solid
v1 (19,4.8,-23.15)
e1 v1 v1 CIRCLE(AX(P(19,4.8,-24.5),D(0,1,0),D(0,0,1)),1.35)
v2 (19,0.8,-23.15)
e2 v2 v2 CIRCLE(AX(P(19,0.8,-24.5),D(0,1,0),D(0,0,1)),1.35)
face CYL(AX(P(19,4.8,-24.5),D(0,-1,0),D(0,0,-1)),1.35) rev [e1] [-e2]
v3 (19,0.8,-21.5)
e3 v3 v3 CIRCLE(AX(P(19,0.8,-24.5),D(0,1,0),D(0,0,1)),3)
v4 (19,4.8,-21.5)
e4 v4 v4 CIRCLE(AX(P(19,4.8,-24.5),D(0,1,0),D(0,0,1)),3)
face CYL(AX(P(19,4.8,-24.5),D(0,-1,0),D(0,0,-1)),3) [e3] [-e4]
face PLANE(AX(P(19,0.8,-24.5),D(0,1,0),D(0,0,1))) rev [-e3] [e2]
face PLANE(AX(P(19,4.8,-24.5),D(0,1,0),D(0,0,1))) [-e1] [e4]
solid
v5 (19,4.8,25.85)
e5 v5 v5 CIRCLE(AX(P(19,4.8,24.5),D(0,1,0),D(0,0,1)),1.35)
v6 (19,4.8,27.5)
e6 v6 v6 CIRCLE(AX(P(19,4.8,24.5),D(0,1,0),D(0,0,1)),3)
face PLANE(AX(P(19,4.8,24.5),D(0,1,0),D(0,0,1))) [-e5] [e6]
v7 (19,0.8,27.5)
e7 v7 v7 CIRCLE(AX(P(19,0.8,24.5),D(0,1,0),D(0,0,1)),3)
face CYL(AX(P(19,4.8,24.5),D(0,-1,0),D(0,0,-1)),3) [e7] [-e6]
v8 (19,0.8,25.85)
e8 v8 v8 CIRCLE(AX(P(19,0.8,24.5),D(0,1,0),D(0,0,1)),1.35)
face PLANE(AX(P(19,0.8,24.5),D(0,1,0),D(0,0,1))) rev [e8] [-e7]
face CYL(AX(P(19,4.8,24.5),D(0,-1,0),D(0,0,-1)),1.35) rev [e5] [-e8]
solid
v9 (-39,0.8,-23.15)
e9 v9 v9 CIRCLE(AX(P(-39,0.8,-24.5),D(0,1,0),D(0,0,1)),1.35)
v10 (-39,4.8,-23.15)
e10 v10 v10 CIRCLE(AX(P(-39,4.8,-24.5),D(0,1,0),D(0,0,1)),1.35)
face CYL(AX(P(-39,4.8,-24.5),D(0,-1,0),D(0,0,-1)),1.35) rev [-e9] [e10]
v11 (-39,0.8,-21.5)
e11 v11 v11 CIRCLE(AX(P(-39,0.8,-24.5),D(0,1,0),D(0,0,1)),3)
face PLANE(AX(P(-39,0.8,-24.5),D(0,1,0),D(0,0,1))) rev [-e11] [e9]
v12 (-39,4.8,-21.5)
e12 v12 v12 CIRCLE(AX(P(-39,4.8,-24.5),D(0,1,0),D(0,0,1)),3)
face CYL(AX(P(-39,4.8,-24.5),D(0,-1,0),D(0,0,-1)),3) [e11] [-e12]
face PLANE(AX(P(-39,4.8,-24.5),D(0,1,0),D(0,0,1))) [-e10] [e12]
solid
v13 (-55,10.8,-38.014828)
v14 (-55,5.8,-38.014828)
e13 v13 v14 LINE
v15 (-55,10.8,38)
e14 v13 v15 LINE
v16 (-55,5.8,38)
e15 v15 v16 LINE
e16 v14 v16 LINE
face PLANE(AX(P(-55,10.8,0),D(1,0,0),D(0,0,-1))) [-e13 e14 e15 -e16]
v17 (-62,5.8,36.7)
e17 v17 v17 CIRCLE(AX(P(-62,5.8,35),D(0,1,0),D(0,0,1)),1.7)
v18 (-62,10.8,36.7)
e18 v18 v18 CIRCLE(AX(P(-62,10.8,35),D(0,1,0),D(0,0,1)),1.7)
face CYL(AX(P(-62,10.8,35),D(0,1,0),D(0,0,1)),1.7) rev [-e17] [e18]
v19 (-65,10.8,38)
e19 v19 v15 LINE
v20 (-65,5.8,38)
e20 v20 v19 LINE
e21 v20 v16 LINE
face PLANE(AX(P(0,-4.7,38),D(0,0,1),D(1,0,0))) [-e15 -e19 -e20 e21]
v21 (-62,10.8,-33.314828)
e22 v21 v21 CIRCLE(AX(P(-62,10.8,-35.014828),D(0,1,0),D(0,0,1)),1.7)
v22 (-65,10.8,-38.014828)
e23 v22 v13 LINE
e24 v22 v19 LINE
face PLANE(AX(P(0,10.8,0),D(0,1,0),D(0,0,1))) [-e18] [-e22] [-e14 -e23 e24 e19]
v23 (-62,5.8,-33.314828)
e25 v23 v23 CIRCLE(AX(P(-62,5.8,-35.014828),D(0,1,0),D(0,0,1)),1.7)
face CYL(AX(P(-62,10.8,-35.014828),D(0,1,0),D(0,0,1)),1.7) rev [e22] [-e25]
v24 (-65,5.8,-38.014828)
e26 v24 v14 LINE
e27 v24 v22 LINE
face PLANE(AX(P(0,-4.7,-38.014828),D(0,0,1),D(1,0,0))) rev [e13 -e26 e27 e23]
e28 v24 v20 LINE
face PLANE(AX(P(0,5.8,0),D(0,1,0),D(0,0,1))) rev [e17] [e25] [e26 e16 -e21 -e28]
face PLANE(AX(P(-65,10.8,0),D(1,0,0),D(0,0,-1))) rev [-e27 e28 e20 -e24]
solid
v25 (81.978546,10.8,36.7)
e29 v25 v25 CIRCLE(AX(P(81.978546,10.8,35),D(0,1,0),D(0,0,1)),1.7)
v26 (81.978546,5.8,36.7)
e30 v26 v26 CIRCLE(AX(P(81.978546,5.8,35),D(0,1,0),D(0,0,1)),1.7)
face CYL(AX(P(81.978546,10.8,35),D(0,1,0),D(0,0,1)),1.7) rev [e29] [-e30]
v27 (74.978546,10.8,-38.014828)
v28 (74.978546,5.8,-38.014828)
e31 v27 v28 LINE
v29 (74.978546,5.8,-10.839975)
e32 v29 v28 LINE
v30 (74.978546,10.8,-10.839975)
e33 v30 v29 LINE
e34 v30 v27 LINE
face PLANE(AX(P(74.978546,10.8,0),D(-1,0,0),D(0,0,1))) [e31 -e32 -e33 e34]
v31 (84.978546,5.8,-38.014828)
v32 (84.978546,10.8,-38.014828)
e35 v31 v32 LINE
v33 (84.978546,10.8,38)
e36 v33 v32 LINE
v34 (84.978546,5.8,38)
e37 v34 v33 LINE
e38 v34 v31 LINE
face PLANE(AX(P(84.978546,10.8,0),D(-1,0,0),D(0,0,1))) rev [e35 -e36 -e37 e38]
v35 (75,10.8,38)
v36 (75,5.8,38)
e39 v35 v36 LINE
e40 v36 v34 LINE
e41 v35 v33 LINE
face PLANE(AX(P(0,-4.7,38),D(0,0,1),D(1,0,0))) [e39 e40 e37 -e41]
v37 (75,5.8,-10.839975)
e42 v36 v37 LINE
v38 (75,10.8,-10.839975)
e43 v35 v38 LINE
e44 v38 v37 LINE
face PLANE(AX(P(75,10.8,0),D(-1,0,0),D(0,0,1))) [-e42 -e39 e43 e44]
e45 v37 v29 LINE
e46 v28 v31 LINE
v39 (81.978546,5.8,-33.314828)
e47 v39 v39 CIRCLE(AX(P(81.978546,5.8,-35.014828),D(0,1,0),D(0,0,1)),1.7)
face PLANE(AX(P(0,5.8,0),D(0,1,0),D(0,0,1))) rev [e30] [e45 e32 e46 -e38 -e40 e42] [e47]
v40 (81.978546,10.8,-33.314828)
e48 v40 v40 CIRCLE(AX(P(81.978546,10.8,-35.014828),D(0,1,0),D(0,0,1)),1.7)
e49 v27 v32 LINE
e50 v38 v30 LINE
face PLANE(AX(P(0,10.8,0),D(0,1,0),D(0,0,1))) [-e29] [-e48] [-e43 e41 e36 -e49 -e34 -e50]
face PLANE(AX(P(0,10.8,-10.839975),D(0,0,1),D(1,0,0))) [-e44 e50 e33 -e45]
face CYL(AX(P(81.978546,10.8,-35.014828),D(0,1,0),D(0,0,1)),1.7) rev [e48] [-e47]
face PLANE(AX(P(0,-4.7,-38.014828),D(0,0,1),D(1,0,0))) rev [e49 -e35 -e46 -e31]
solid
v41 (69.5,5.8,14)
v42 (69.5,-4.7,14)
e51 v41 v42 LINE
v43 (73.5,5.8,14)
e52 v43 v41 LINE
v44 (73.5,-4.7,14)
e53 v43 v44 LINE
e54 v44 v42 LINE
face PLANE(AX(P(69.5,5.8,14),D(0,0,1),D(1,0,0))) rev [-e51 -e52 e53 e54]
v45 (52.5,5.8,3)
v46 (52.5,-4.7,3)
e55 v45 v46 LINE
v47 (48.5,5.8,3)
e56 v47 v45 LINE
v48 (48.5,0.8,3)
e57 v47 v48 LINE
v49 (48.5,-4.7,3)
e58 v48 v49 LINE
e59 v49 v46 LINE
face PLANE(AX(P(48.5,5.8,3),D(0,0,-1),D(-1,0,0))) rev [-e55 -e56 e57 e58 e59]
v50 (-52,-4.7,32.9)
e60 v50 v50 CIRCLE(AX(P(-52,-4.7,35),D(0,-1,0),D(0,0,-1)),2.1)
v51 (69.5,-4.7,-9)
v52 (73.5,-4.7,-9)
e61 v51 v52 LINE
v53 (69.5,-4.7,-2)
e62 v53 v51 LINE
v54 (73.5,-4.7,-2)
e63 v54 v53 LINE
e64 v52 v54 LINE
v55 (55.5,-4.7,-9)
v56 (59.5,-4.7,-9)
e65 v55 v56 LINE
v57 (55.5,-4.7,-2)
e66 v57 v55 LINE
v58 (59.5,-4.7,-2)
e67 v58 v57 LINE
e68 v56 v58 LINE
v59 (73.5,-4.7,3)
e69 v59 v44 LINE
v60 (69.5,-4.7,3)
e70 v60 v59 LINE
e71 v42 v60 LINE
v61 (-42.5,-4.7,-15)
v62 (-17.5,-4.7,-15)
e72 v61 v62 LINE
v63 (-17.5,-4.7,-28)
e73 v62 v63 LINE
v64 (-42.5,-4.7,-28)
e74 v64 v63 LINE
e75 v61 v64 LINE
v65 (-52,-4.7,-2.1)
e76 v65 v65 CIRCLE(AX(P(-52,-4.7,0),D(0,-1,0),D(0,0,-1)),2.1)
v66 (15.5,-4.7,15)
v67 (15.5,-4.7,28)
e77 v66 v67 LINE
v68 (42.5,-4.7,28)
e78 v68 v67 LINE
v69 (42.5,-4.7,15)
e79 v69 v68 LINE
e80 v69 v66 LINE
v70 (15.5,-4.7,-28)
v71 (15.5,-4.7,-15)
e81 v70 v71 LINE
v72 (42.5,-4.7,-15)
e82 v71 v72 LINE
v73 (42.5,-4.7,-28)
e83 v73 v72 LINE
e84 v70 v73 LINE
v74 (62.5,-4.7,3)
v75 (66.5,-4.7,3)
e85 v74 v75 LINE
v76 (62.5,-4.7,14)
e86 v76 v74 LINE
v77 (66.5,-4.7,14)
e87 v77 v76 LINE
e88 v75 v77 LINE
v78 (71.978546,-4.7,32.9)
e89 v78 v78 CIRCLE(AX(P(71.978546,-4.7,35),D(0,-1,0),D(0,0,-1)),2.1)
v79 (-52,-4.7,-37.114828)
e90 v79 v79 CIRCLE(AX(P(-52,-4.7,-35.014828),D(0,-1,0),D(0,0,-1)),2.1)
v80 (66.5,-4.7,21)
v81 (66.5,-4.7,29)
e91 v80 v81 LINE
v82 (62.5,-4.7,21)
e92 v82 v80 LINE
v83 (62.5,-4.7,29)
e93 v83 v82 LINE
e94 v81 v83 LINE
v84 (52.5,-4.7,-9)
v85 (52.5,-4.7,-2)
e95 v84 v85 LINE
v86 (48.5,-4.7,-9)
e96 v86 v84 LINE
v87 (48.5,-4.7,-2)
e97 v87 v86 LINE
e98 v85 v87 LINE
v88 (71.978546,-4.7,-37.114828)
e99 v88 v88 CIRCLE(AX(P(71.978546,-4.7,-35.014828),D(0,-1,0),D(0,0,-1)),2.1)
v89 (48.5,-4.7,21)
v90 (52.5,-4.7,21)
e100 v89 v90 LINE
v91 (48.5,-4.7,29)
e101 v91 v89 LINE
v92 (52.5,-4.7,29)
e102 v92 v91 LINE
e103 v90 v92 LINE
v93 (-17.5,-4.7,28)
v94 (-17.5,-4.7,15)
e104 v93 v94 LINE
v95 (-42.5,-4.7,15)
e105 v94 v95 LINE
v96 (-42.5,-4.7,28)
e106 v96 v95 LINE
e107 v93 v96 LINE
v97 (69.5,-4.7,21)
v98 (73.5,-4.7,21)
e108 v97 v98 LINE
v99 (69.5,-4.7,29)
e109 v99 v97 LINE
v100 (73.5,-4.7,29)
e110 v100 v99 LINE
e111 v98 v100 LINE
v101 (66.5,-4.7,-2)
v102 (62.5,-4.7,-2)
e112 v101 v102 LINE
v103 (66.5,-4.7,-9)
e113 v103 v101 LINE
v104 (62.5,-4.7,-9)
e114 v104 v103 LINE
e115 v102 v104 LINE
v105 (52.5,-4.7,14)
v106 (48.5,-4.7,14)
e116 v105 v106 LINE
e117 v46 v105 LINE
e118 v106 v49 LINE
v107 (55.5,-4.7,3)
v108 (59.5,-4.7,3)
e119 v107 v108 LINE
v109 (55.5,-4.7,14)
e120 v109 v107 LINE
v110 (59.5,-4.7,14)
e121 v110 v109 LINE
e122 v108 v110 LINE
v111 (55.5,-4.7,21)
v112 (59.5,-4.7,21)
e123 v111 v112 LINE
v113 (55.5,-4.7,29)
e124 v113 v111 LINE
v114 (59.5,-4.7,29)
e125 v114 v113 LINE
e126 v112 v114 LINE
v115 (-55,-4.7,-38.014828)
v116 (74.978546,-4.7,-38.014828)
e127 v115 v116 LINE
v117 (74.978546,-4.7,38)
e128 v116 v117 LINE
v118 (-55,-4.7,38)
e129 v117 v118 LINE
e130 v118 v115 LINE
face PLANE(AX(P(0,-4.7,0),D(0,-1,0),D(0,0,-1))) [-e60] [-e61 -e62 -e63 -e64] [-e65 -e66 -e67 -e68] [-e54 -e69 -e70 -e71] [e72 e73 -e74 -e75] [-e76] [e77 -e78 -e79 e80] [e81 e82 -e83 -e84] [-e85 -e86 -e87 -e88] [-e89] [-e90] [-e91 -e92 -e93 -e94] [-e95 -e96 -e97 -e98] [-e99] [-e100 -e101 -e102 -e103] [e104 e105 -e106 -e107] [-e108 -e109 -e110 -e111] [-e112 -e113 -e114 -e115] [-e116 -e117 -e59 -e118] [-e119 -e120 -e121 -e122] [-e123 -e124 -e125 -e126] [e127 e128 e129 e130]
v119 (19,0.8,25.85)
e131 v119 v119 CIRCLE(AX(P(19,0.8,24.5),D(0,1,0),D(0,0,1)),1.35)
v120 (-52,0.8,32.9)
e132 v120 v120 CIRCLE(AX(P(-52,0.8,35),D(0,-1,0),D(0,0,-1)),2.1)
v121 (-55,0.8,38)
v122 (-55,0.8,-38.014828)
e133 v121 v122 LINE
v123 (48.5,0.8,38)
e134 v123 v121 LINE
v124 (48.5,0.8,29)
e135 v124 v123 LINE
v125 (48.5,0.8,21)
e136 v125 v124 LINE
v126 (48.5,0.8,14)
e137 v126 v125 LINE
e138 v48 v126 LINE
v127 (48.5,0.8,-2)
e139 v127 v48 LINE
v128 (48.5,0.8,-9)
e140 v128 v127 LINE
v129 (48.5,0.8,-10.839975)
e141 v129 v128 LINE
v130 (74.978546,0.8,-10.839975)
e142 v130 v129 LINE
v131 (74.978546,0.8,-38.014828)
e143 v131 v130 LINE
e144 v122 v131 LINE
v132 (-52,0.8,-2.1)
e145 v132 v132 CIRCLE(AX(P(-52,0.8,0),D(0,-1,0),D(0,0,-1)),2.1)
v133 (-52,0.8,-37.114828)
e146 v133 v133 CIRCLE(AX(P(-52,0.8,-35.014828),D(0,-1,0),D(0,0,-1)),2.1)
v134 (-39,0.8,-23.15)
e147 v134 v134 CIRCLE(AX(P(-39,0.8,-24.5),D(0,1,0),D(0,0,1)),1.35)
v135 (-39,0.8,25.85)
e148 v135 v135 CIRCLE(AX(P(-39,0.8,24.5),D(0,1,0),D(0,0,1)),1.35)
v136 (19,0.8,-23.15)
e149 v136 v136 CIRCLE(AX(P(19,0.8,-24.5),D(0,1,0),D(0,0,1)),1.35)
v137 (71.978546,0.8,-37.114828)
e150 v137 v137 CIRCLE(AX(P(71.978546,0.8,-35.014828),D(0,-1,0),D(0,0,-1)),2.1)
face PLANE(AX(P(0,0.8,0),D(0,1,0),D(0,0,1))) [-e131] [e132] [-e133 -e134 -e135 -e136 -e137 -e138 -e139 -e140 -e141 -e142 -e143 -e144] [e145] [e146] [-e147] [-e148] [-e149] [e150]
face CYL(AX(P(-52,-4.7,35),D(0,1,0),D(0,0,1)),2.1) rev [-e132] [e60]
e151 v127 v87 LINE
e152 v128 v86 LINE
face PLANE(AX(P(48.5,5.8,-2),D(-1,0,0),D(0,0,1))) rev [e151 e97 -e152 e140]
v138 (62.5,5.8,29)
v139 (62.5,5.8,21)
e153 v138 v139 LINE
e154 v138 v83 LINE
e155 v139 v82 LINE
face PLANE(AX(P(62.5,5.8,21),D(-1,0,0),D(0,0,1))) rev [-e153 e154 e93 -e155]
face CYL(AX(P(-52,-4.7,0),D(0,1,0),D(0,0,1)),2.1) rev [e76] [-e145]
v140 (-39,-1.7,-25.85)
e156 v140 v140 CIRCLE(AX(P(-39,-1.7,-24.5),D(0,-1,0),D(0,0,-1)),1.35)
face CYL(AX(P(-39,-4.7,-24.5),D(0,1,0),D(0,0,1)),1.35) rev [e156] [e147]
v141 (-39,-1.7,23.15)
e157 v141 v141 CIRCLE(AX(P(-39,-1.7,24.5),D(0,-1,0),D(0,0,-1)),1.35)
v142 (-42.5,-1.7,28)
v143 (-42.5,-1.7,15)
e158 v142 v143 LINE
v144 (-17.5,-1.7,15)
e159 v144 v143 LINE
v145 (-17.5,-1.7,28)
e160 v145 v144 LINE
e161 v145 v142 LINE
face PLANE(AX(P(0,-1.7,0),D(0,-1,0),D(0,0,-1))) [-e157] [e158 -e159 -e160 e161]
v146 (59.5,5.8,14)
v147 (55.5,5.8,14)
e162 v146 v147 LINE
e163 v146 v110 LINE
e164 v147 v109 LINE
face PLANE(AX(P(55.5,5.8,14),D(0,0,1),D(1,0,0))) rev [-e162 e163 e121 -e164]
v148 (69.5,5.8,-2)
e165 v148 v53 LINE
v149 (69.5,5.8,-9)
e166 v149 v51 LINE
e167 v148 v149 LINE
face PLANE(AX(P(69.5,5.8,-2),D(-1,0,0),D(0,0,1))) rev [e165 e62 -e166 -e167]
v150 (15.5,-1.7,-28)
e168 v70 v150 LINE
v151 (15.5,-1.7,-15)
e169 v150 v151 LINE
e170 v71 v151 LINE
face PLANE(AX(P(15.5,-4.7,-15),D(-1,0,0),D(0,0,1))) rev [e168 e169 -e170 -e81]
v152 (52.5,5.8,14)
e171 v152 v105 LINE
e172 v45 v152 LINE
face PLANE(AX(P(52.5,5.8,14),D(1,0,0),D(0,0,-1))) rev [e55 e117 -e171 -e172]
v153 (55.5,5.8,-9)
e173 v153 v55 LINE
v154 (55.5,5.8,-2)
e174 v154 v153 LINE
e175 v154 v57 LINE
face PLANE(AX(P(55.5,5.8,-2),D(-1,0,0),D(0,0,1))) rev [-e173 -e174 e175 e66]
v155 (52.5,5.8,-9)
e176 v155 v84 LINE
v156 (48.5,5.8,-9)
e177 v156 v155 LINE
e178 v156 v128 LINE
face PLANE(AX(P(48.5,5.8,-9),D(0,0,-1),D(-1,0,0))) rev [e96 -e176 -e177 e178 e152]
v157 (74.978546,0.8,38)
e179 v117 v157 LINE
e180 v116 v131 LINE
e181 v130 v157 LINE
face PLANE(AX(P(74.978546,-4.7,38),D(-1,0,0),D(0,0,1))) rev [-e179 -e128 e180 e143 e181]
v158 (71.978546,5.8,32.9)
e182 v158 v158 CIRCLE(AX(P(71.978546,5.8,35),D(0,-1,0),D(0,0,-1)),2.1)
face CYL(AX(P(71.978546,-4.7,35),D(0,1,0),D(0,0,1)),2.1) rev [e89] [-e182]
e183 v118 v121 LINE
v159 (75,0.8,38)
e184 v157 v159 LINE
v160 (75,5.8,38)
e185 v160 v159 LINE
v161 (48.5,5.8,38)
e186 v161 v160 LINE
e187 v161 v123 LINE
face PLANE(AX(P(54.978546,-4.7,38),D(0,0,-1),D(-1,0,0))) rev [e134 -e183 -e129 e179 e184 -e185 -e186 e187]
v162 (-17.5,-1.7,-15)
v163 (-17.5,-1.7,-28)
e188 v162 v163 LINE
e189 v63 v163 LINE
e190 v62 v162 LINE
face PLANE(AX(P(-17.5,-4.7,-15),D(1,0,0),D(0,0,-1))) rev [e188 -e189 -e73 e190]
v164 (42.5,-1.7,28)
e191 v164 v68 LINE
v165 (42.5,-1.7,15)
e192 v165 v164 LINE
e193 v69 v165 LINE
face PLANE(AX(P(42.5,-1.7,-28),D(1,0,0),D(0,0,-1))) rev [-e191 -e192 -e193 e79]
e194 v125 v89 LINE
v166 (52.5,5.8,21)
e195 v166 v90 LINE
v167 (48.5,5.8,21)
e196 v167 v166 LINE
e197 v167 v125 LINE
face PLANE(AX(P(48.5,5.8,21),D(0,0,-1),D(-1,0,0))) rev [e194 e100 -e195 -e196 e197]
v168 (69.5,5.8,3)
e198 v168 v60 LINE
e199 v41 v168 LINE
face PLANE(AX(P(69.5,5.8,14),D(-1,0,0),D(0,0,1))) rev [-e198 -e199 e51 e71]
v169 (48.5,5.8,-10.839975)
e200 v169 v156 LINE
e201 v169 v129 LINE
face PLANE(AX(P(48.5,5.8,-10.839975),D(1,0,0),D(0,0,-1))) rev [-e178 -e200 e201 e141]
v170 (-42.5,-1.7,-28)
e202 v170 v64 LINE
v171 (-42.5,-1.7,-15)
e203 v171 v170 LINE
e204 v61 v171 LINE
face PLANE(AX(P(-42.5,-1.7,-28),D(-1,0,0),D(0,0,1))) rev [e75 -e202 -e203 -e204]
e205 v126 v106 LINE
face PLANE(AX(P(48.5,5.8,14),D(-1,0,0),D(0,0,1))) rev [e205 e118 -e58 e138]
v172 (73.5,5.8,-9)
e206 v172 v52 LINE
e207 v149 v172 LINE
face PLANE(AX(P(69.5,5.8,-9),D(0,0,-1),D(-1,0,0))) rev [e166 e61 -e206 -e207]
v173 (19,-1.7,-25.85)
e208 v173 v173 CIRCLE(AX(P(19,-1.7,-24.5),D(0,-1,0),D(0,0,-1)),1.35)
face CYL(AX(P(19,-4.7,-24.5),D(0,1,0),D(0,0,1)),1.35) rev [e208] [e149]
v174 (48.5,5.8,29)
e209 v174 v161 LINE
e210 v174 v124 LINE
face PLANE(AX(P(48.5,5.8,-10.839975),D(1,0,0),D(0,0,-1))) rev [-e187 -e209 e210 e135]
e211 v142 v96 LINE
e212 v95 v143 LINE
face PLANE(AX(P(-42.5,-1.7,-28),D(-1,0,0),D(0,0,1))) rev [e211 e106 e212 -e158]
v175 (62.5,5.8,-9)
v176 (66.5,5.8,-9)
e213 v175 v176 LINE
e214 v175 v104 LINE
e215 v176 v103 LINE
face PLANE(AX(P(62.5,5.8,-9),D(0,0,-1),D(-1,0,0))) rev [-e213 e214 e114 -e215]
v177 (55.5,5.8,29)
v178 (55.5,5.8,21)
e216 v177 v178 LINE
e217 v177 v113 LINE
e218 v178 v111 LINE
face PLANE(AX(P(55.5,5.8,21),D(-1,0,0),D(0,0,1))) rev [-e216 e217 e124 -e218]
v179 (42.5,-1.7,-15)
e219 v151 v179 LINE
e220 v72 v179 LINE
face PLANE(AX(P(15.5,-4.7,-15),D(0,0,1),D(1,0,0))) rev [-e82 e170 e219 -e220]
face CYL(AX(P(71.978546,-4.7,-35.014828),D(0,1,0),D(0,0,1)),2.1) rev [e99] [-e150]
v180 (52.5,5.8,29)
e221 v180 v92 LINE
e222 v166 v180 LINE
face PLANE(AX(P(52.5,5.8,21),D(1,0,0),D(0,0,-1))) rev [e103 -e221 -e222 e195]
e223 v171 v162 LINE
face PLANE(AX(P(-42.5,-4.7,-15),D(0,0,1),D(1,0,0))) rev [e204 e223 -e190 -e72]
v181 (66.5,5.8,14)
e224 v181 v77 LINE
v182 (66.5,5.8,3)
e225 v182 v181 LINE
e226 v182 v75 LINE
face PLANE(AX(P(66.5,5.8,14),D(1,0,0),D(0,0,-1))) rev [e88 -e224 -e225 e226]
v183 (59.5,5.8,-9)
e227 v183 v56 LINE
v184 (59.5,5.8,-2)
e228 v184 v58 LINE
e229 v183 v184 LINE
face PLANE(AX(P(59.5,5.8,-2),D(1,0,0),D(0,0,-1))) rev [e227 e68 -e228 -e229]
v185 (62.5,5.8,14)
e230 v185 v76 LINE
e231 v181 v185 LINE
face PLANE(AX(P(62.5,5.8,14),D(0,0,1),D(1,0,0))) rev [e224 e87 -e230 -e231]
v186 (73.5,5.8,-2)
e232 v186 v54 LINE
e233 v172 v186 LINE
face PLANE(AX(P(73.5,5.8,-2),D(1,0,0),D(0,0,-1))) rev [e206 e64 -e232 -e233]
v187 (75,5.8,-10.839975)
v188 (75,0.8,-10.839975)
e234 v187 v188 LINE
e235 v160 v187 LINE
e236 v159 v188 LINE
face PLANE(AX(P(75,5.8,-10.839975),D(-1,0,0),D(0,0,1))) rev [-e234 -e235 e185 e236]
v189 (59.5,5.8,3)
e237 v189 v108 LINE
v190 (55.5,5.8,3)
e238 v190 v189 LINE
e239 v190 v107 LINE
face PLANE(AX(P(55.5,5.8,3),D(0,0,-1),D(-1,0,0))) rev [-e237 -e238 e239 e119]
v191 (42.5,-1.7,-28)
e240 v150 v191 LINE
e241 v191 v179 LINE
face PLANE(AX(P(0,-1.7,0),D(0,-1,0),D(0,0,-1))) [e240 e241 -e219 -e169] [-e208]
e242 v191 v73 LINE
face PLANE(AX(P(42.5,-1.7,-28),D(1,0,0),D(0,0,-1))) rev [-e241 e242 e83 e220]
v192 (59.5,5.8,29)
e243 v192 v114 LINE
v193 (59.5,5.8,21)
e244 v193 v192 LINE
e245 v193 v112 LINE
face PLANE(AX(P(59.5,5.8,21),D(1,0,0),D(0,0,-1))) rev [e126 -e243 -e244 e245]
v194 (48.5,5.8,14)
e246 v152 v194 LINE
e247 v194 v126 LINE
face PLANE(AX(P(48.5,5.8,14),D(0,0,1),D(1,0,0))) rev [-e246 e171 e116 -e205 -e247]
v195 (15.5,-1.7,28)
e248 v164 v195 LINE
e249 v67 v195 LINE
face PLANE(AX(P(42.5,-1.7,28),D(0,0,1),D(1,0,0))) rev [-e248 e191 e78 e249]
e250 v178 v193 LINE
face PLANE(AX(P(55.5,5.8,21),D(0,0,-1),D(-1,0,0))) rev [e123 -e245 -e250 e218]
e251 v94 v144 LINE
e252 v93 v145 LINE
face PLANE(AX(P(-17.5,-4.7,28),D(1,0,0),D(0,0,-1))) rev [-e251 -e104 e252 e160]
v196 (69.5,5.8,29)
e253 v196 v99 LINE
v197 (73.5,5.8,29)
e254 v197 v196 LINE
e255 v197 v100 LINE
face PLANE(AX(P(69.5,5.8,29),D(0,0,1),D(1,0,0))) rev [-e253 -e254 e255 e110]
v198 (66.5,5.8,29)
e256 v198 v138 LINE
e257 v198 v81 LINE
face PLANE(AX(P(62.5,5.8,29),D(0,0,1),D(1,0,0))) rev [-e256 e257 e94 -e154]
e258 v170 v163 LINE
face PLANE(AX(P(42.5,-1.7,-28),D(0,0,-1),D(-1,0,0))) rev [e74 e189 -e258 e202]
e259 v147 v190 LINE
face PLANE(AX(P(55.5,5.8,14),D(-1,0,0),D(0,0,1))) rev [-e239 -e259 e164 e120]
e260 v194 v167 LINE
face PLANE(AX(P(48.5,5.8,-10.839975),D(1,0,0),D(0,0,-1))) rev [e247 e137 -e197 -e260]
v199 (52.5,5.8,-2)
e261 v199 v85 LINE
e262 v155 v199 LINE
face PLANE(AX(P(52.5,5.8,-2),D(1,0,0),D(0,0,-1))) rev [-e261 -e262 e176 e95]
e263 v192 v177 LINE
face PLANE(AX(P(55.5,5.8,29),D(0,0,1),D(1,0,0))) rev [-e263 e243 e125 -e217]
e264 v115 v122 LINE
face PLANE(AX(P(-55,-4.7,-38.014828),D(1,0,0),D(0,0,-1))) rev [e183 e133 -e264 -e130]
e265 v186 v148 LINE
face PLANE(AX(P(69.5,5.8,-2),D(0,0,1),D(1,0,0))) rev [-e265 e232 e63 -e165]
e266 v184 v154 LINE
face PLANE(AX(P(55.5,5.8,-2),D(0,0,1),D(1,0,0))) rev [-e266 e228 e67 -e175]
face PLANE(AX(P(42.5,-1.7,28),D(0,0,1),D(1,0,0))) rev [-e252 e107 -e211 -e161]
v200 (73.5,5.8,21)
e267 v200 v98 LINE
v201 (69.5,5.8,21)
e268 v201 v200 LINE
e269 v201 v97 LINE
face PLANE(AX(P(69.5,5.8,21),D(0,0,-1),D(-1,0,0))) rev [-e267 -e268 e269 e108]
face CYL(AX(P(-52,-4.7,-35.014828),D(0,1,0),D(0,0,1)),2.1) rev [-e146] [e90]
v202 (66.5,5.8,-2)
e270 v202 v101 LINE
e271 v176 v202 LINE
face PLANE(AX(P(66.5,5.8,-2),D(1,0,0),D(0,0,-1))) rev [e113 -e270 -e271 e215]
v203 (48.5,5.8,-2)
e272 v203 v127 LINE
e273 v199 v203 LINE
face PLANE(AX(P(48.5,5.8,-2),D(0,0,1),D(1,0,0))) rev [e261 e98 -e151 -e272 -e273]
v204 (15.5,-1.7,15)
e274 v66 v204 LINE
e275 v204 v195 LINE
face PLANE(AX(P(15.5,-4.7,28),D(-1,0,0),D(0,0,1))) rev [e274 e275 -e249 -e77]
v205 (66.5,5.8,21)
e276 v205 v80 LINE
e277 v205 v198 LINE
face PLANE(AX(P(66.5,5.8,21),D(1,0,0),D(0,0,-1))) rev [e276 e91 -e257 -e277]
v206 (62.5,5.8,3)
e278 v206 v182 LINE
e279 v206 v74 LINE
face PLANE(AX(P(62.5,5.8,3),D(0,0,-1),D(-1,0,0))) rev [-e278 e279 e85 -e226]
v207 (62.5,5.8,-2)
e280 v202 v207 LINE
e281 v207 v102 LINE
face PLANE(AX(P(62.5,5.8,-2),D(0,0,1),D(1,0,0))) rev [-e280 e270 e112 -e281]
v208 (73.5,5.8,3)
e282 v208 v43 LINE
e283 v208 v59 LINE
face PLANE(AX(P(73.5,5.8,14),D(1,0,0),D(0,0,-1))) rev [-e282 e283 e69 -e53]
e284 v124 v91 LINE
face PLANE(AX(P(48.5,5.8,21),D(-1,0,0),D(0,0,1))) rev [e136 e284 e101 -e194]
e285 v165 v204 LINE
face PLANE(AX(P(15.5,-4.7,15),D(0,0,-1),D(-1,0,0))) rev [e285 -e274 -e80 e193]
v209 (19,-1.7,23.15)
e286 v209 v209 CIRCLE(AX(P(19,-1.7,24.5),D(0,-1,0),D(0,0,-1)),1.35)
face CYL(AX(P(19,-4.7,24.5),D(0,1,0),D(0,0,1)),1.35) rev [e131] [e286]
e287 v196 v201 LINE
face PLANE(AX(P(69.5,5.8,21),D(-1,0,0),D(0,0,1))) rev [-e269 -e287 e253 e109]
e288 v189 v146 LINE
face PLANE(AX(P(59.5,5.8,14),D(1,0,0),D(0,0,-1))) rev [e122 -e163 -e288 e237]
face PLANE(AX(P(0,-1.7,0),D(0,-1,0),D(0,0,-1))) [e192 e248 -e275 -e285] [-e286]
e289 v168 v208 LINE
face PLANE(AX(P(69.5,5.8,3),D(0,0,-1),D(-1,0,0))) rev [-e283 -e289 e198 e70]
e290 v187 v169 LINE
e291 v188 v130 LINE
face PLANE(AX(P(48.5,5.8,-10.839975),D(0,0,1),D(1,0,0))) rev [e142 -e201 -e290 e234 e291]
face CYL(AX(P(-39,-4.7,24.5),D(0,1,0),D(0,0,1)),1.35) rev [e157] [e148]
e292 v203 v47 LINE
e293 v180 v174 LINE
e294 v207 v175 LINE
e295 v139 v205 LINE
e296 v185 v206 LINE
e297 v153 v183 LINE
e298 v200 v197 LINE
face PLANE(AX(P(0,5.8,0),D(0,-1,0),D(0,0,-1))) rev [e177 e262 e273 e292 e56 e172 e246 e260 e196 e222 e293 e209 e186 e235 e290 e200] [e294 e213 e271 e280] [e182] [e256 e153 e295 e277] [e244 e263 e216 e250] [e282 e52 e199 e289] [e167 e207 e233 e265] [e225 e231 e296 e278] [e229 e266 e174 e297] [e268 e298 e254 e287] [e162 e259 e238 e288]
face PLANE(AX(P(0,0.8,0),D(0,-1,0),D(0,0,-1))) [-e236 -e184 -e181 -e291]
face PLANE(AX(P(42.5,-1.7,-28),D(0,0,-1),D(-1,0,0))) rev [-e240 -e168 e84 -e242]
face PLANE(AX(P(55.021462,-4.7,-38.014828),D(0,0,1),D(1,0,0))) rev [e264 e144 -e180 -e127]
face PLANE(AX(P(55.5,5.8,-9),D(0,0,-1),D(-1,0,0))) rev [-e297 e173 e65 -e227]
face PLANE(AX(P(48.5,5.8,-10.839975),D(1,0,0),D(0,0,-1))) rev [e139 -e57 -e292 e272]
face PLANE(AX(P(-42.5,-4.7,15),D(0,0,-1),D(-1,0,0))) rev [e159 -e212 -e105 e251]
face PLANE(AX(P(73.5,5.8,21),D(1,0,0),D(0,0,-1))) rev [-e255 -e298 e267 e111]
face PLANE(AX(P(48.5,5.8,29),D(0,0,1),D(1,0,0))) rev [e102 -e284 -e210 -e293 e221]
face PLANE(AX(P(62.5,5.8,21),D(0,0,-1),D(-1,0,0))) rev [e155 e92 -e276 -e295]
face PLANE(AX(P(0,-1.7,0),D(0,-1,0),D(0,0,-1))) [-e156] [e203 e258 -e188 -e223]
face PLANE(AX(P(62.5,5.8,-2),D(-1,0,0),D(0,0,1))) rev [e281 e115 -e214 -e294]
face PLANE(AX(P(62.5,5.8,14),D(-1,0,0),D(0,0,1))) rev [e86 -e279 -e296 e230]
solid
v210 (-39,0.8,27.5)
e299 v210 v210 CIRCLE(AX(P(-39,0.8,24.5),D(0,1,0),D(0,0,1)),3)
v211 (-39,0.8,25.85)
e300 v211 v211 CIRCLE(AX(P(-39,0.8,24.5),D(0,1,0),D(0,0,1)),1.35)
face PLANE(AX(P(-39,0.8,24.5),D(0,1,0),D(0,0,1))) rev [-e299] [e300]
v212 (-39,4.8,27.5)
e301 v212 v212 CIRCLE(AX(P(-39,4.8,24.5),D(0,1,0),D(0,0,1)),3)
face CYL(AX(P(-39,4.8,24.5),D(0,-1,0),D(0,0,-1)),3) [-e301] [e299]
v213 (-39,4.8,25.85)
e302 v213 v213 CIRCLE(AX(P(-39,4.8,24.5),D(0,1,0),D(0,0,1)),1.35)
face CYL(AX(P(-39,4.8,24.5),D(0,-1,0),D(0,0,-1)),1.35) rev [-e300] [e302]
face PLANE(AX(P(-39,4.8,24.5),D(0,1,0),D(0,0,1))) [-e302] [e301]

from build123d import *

# Parameters (mm, degrees)
BASES_W                         = 85
BASES_H                         = 56
BASE_DEPTH                      = 0.8
M2_5_CLEARANCE_HOLE_D           = 2.7
FASTENERAREA_START              = -0.01
FASTENERAREAS_R                 = 3
FASTENERAREAS_R_2               = 1.35
FASTENERAREA_DEPTH              = 0.01
FASTENERAREAS_2_R               = 3
FASTENERAREAS_2_R_2             = 1.35
BOSS_EXTRUDE1_DEPTH             = 4
BOSS_EXTRUDE1_2_DEPTH           = 4
HLP_START                       = 0.8
HLP_FASTENERHOLES_OUTLINE_R     = 3
HLP_FASTENERHOLES_OUTLINE_R_2   = 1.35
HLP_FASTENERHOLES_DEPTH         = 4
HLP_FASTENERHOLES_2_OUTLINE_R   = 3
HLP_FASTENERHOLES_2_OUTLINE_R_2 = 1.35
HLP_FASTENERHOLES_2_DEPTH       = 4
HLP_START_2                     = -2
HLP_FASTENERHOLES_3_OUTLINE_R   = 1.35
HLP_FASTENERHOLES_3_DEPTH       = 4
HLP_START_3                     = 0.79
HLP_FASTENERHOLES_4_OUTLINE_R   = 3
HLP_FASTENERHOLES_4_OUTLINE_R_2 = 1.35
HLP_FASTENERHOLES_4_DEPTH       = 1.21
SKETCH4_R                       = 2.1
BOSS_EXTRUDE2_DEPTH             = 5.5
SKETCH7_W                       = 85
SKETCH7_H                       = 56
CUT_EXTRUDE4_DEPTH              = 3
CUT_EXTRUDE5_DEPTH              = 85.244641278
CUT_EXTRUDE5_DEPTH_BACK         = 85.244641278
SKETCH8_R                       = 1.35
SKETCH9_W                       = 26.5
SKETCH9_H                       = 48.839975475
BOSS_EXTRUDE3_DEPTH             = 5
SKETCH12_R                      = 2.1
SKETCH12_W                      = 4
SKETCH12_H                      = 11
SKETCH12_H_2                    = 8
SKETCH12_H_3                    = 7
CUT_EXTRUDE6_DEPTH              = 85.737106223
BOSS_EXTRUDE4_DEPTH             = 3
BOSS_EXTRUDE5_DEPTH             = 5
CUT_EXTRUDE7_DEPTH              = 99.828270638
CUT_EXTRUDE7_DEPTH_BACK         = 99.828270638
SKETCH17_W                      = 1.7
SKETCH17_H                      = 15.5
M3_CLEARANCE_HOLE1_AT_2_COUNT   = 2
M3_CLEARANCE_HOLE1_AT_2_PITCH   = 143.978546352
M3_CLEARANCE_HOLE1_AT_3_COUNT   = 2
M3_CLEARANCE_HOLE1_AT_3_PITCH   = 160.099650194
M3_CLEARANCE_HOLE1_AT_4_COUNT   = 2
M3_CLEARANCE_HOLE1_AT_4_PITCH   = 70.014828304


with BuildPart() as part:
    # BaseS → Base (new, symmetric)
    with BuildSketch(Plane(origin=(0, 0, 0), x_dir=(1, 0, 0), z_dir=(0, 1, 0))):
        Rectangle(BASES_W, BASES_H)
    extrude(amount=BASE_DEPTH, both=True)

    # M2.5 Clearance Hole (through all)
    with Locations(Plane(origin=(0, 0.8, 0), x_dir=(1, 0, 0), z_dir=(0, 1, 0))):
        with Locations((-39, 24.5), (-39, -24.5)):
            Hole(M2_5_CLEARANCE_HOLE_D / 2)

    # FastenerAreaS → FastenerArea (cut)
    # profile 1 of 2: a face of its own
    with BuildSketch(Plane(origin=(0, 0.8, 0), x_dir=(1, 0, 0), z_dir=(0, 1, 0)).offset(FASTENERAREA_START)):
        with Locations(Location((-39, -24.5, 0), (0, 0, 270))):
            Circle(FASTENERAREAS_R)
        with Locations(Location((-39, -24.5, 0), (0, 0, 270))):
            Circle(FASTENERAREAS_R_2, mode=Mode.SUBTRACT)
    # profile 2 of 2: a face of its own
    with BuildSketch(Plane(origin=(0, 0.8, 0), x_dir=(1, 0, 0), z_dir=(0, 1, 0)).offset(FASTENERAREA_START)):
        with Locations(Location((-39, 24.5, 0), (0, 0, 270))):
            Circle(FASTENERAREAS_R)
        with Locations(Location((-39, 24.5, 0), (0, 0, 270))):
            Circle(FASTENERAREAS_R_2, mode=Mode.SUBTRACT)
    fastenerarea = extrude(amount=FASTENERAREA_DEPTH, mode=Mode.SUBTRACT)

    # HLP FastenerHoles 3 outline → HLP FastenerHoles 3 (cut)
    with BuildSketch(Plane(origin=(0, 0, 0), x_dir=(1, 0, 0), z_dir=(0, 1, 0)).offset(HLP_START_2)):
        with Locations((19, -24.5)):
            Circle(HLP_FASTENERHOLES_3_OUTLINE_R)
        with Locations((19, 24.5)):
            Circle(HLP_FASTENERHOLES_3_OUTLINE_R)
    hlp_fastenerholes_3 = extrude(amount=HLP_FASTENERHOLES_3_DEPTH, mode=Mode.SUBTRACT)

    # HLP FastenerHoles 4 outline → HLP FastenerHoles 4 (cut)
    # profile 1 of 2: a face of its own
    with BuildSketch(Plane(origin=(0, 0, 0), x_dir=(1, 0, 0), z_dir=(0, 1, 0)).offset(HLP_START_3)):
        with Locations((19, 24.5)):
            Circle(HLP_FASTENERHOLES_4_OUTLINE_R)
        with Locations((19, 24.5)):
            Circle(HLP_FASTENERHOLES_4_OUTLINE_R_2, mode=Mode.SUBTRACT)
    # profile 2 of 2: a face of its own
    with BuildSketch(Plane(origin=(0, 0, 0), x_dir=(1, 0, 0), z_dir=(0, 1, 0)).offset(HLP_START_3)):
        with Locations((19, -24.5)):
            Circle(HLP_FASTENERHOLES_4_OUTLINE_R)
        with Locations((19, -24.5)):
            Circle(HLP_FASTENERHOLES_4_OUTLINE_R_2, mode=Mode.SUBTRACT)
    hlp_fastenerholes_4 = extrude(amount=HLP_FASTENERHOLES_4_DEPTH, mode=Mode.SUBTRACT)


with BuildPart() as body_2:
    # FastenerAreaS<2> → Boss-Extrude1 (new body)
    with BuildSketch(Plane(origin=(0, 0.8, 0), x_dir=(1, 0, 0), z_dir=(0, 1, 0))):
        with Locations(Location((-39, -24.5, 0), (0, 0, 270))):
            Circle(FASTENERAREAS_2_R)
        with Locations(Location((-39, -24.5, 0), (0, 0, 270))):
            Circle(FASTENERAREAS_2_R_2, mode=Mode.SUBTRACT)
    extrude(amount=BOSS_EXTRUDE1_DEPTH)


with BuildPart() as body_3:
    # FastenerAreaS<2> → Boss-Extrude1 2 (new body)
    with BuildSketch(Plane(origin=(0, 0.8, 0), x_dir=(1, 0, 0), z_dir=(0, 1, 0))):
        with Locations(Location((-39, 24.5, 0), (0, 0, 270))):
            Circle(FASTENERAREAS_2_R)
        with Locations(Location((-39, 24.5, 0), (0, 0, 270))):
            Circle(FASTENERAREAS_2_R_2, mode=Mode.SUBTRACT)
    extrude(amount=BOSS_EXTRUDE1_2_DEPTH)


with BuildPart() as body_4:
    # HLP FastenerHoles: read off the stored shape, not the designer's step
    # HLP FastenerHoles outline → HLP FastenerHoles (new body)
    with BuildSketch(Plane(origin=(0, 0, 0), x_dir=(1, 0, 0), z_dir=(0, 1, 0)).offset(HLP_START)):
        with Locations((19, 24.5)):
            Circle(HLP_FASTENERHOLES_OUTLINE_R)
        with Locations((19, 24.5)):
            Circle(HLP_FASTENERHOLES_OUTLINE_R_2, mode=Mode.SUBTRACT)
    hlp_fastenerholes = extrude(amount=HLP_FASTENERHOLES_DEPTH)


with BuildPart() as body_5:
    # HLP FastenerHoles 2 outline → HLP FastenerHoles 2 (new body)
    with BuildSketch(Plane(origin=(0, 0, 0), x_dir=(1, 0, 0), z_dir=(0, 1, 0)).offset(HLP_START)):
        with Locations((19, -24.5)):
            Circle(HLP_FASTENERHOLES_2_OUTLINE_R)
        with Locations((19, -24.5)):
            Circle(HLP_FASTENERHOLES_2_OUTLINE_R_2, mode=Mode.SUBTRACT)
    hlp_fastenerholes_2 = extrude(amount=HLP_FASTENERHOLES_2_DEPTH)


with BuildPart() as part_1:
    add(part.part)

    # VM FA: FastenerArea, HLP FastenerHoles, HLP FastenerHoles 2, HLP FastenerHoles 3, HLP FastenerHoles 4 across plane
    add(fastenerarea.mirror(Plane.ZX), mode=Mode.SUBTRACT)
    add(hlp_fastenerholes.mirror(Plane.ZX), mode=Mode.SUBTRACT)
    add(hlp_fastenerholes_2.mirror(Plane.ZX), mode=Mode.SUBTRACT)
    add(hlp_fastenerholes_3.mirror(Plane.ZX), mode=Mode.SUBTRACT)
    add(hlp_fastenerholes_4.mirror(Plane.ZX), mode=Mode.SUBTRACT)

    # Sketch4 → Boss-Extrude2 (add)
    with BuildSketch(Plane.XZ.offset(-0.8)):
        Polygon((55.021462019, -38.014828304), (-55, -38.014828304), (-55, 38), (54.978546352, 38), (74.978546352, 38), (74.978546352, -38.014828304), align=None)
        with Locations(Location((-52, 35, 0), (0, 0, 270))):
            Circle(SKETCH4_R, mode=Mode.SUBTRACT)
        with Locations(Location((-52, -35.014828304, 0), (0, 0, 270))):
            Circle(SKETCH4_R, mode=Mode.SUBTRACT)
        with Locations(Location((71.978546352, -35.014828304, 0), (0, 0, 270))):
            Circle(SKETCH4_R, mode=Mode.SUBTRACT)
        with Locations(Location((71.978546352, 35, 0), (0, 0, 270))):
            Circle(SKETCH4_R, mode=Mode.SUBTRACT)
        with Locations(Location((-52, 0, 0), (0, 0, 270))):
            Circle(SKETCH4_R, mode=Mode.SUBTRACT)
    extrude(amount=BOSS_EXTRUDE2_DEPTH)

    # Sketch7 → Cut-Extrude4 (cut)
    with BuildSketch(Plane.XZ.offset(4.7)):
        Rectangle(SKETCH7_W, SKETCH7_H)
    extrude(amount=-CUT_EXTRUDE4_DEPTH, mode=Mode.SUBTRACT)

    # Sketch8 → Cut-Extrude5 (cut, two sides: drawn at the far end of the back side and taken through both)
    with BuildSketch(Plane(origin=(0, 0.8, 0), x_dir=(1, 0, 0), z_dir=(0, 1, 0)).offset(-CUT_EXTRUDE5_DEPTH_BACK)):
        with Locations(Location((19, -24.5, 0), (0, 0, 270))):
            Circle(SKETCH8_R)
        with Locations(Location((19, 24.5, 0), (0, 0, 270))):
            Circle(SKETCH8_R)
        with Locations(Location((-39, 24.5, 0), (0, 0, 270))):
            Circle(SKETCH8_R)
        with Locations(Location((-39, -24.5, 0), (0, 0, 270))):
            Circle(SKETCH8_R)
    extrude(amount=CUT_EXTRUDE5_DEPTH + CUT_EXTRUDE5_DEPTH_BACK, mode=Mode.SUBTRACT)

    # Sketch9 → Boss-Extrude3 (add)
    with BuildSketch(Plane(origin=(0, 0.8, 0), x_dir=(1, 0, 0), z_dir=(0, 1, 0))):
        with Locations((61.75, -13.580012262)):
            Rectangle(SKETCH9_W, SKETCH9_H)
    extrude(amount=BOSS_EXTRUDE3_DEPTH)

    # Sketch12 → Cut-Extrude6 (cut, through all)
    with BuildSketch(Plane.XZ.offset(4.7)):
        with Locations(Location((71.978546352, 35, 0), (0, 0, 270))):
            Circle(SKETCH12_R)
        with Locations(Location((71.978546352, -35.014828304, 0), (0, 0, 270))):
            Circle(SKETCH12_R)
        with Locations((57.5, 8.5)):
            Rectangle(SKETCH12_W, SKETCH12_H)
        with Locations((50.5, 8.5)):
            Rectangle(SKETCH12_W, SKETCH12_H)
        with Locations((64.5, 8.5)):
            Rectangle(SKETCH12_W, SKETCH12_H)
        with Locations((71.5, 8.5)):
            Rectangle(SKETCH12_W, SKETCH12_H)
        with Locations((50.5, 25)):
            Rectangle(SKETCH12_W, SKETCH12_H_2)
        with Locations((57.5, 25)):
            Rectangle(SKETCH12_W, SKETCH12_H_2)
        with Locations((64.5, 25)):
            Rectangle(SKETCH12_W, SKETCH12_H_2)
        with Locations((71.5, 25)):
            Rectangle(SKETCH12_W, SKETCH12_H_2)
        with Locations((50.5, -5.5)):
            Rectangle(SKETCH12_W, SKETCH12_H_3)
        with Locations((57.5, -5.5)):
            Rectangle(SKETCH12_W, SKETCH12_H_3)
        with Locations((64.5, -5.5)):
            Rectangle(SKETCH12_W, SKETCH12_H_3)
        with Locations((71.5, -5.5)):
            Rectangle(SKETCH12_W, SKETCH12_H_3)
    extrude(amount=-CUT_EXTRUDE6_DEPTH, mode=Mode.SUBTRACT)

    # Sketch13 → Boss-Extrude4 (add)
    with BuildSketch(Plane.XZ.offset(1.7)):
        Polygon((-42.5, -15), (-42.5, 15), (-17.5, 15), (-17.5, 28), (15.5, 28), (15.5, 15), (42.5, 15), (42.5, -15), (15.5, -15), (15.5, -28), (-17.5, -28), (-17.5, -15), align=None)
    extrude(amount=BOSS_EXTRUDE4_DEPTH)


with BuildPart() as body_6:
    # Sketch15 → Boss-Extrude5 (new body)
    with BuildSketch(Plane(origin=(0, 5.8, 0), x_dir=(1, 0, 0), z_dir=(0, 1, 0))):
        Polygon((74.978546352, 38.014828304), (74.978546352, 10.839975475), (75, 10.839975475), (75, 0.839975475), (84.978546352, 0.839975475), (84.978546352, 48.014828304), (-65, 48.014828304), (-65, -48), (58.5, -48), (58.5, -38), (48.5, -38), (-55, -38), (-55, 38.014828304), align=None)
        Polygon((84.978546352, 0.839975475), (75, 0.839975475), (75, -38), (58.5, -38), (58.5, -48), (84.978546352, -48), align=None)
    extrude(amount=BOSS_EXTRUDE5_DEPTH)

    # Sketch19 → Cut-Extrude7 (cut, two sides: drawn at the far end of the back side and taken through both)
    with BuildSketch(Plane(origin=(0, 10.8, 0), x_dir=(1, 0, 0), z_dir=(0, 1, 0)).offset(-CUT_EXTRUDE7_DEPTH_BACK)):
        Polygon((84.978546352, 48.014828304), (-65, 48.014828304), (-65, 38.014828304), (-55, 38.014828304), (74.978546352, 38.014828304), (84.978546352, 38.014828304), align=None)
        Polygon((-55, -38), (-65, -38), (-65, -48), (84.978546352, -48), (84.978546352, -38), (75, -38), (48.5, -38), align=None)
    extrude(amount=CUT_EXTRUDE7_DEPTH + CUT_EXTRUDE7_DEPTH_BACK, mode=Mode.SUBTRACT)


with BuildPart() as cut_extrude7_piece_1:
    # of the separate pieces the step leaves, piece 1, a body of its own (cut_extrude7_pieces)
    add(body_6.part.solids().sort_by_distance((-55, 5.8, 38))[0])

    # Sketch17 → M3 Clearance Hole1 (revolve, cut)
    with BuildSketch(Plane(origin=(-62, 10.8, -35.014828304), x_dir=(0, 0, 1), z_dir=(1, 0, 0))):
        with Locations((0.85, 7.75)):
            Rectangle(SKETCH17_W, SKETCH17_H)
    m3_clearance_hole1 = revolve(axis=Axis((-62, 17.15, -35.014828304), (0, -1, 0)), mode=Mode.SUBTRACT)

    # M3 Clearance Hole1 at 4: M3 Clearance Hole1 ×2
    with Locations(*[(0, 0, i * M3_CLEARANCE_HOLE1_AT_4_PITCH) for i in range(1, M3_CLEARANCE_HOLE1_AT_4_COUNT)]):
        add(m3_clearance_hole1, mode=Mode.SUBTRACT)


with BuildPart() as cut_extrude7_piece_2:
    # of the separate pieces the step leaves, piece 2, a body of its own (cut_extrude7_pieces)
    add(body_6.part.solids().sort_by_distance((74.978546352, 5.8, -38.014828304))[0])

    # M3 Clearance Hole1 at 2: M3 Clearance Hole1 ×2
    with Locations(*[(i * M3_CLEARANCE_HOLE1_AT_2_PITCH, 0, 0) for i in range(1, M3_CLEARANCE_HOLE1_AT_2_COUNT)]):
        add(m3_clearance_hole1, mode=Mode.SUBTRACT)

    # M3 Clearance Hole1 at 3: M3 Clearance Hole1 ×2
    with Locations(*[Vector(0.8993058147090349, 0, 0.4373203078185589) * (i * M3_CLEARANCE_HOLE1_AT_3_PITCH) for i in range(1, M3_CLEARANCE_HOLE1_AT_3_COUNT)]):
        add(m3_clearance_hole1, mode=Mode.SUBTRACT)


solid = Compound([body_2.part, body_3.part, body_4.part, body_5.part, part_1.part, cut_extrude7_piece_1.part, cut_extrude7_piece_2.part])
